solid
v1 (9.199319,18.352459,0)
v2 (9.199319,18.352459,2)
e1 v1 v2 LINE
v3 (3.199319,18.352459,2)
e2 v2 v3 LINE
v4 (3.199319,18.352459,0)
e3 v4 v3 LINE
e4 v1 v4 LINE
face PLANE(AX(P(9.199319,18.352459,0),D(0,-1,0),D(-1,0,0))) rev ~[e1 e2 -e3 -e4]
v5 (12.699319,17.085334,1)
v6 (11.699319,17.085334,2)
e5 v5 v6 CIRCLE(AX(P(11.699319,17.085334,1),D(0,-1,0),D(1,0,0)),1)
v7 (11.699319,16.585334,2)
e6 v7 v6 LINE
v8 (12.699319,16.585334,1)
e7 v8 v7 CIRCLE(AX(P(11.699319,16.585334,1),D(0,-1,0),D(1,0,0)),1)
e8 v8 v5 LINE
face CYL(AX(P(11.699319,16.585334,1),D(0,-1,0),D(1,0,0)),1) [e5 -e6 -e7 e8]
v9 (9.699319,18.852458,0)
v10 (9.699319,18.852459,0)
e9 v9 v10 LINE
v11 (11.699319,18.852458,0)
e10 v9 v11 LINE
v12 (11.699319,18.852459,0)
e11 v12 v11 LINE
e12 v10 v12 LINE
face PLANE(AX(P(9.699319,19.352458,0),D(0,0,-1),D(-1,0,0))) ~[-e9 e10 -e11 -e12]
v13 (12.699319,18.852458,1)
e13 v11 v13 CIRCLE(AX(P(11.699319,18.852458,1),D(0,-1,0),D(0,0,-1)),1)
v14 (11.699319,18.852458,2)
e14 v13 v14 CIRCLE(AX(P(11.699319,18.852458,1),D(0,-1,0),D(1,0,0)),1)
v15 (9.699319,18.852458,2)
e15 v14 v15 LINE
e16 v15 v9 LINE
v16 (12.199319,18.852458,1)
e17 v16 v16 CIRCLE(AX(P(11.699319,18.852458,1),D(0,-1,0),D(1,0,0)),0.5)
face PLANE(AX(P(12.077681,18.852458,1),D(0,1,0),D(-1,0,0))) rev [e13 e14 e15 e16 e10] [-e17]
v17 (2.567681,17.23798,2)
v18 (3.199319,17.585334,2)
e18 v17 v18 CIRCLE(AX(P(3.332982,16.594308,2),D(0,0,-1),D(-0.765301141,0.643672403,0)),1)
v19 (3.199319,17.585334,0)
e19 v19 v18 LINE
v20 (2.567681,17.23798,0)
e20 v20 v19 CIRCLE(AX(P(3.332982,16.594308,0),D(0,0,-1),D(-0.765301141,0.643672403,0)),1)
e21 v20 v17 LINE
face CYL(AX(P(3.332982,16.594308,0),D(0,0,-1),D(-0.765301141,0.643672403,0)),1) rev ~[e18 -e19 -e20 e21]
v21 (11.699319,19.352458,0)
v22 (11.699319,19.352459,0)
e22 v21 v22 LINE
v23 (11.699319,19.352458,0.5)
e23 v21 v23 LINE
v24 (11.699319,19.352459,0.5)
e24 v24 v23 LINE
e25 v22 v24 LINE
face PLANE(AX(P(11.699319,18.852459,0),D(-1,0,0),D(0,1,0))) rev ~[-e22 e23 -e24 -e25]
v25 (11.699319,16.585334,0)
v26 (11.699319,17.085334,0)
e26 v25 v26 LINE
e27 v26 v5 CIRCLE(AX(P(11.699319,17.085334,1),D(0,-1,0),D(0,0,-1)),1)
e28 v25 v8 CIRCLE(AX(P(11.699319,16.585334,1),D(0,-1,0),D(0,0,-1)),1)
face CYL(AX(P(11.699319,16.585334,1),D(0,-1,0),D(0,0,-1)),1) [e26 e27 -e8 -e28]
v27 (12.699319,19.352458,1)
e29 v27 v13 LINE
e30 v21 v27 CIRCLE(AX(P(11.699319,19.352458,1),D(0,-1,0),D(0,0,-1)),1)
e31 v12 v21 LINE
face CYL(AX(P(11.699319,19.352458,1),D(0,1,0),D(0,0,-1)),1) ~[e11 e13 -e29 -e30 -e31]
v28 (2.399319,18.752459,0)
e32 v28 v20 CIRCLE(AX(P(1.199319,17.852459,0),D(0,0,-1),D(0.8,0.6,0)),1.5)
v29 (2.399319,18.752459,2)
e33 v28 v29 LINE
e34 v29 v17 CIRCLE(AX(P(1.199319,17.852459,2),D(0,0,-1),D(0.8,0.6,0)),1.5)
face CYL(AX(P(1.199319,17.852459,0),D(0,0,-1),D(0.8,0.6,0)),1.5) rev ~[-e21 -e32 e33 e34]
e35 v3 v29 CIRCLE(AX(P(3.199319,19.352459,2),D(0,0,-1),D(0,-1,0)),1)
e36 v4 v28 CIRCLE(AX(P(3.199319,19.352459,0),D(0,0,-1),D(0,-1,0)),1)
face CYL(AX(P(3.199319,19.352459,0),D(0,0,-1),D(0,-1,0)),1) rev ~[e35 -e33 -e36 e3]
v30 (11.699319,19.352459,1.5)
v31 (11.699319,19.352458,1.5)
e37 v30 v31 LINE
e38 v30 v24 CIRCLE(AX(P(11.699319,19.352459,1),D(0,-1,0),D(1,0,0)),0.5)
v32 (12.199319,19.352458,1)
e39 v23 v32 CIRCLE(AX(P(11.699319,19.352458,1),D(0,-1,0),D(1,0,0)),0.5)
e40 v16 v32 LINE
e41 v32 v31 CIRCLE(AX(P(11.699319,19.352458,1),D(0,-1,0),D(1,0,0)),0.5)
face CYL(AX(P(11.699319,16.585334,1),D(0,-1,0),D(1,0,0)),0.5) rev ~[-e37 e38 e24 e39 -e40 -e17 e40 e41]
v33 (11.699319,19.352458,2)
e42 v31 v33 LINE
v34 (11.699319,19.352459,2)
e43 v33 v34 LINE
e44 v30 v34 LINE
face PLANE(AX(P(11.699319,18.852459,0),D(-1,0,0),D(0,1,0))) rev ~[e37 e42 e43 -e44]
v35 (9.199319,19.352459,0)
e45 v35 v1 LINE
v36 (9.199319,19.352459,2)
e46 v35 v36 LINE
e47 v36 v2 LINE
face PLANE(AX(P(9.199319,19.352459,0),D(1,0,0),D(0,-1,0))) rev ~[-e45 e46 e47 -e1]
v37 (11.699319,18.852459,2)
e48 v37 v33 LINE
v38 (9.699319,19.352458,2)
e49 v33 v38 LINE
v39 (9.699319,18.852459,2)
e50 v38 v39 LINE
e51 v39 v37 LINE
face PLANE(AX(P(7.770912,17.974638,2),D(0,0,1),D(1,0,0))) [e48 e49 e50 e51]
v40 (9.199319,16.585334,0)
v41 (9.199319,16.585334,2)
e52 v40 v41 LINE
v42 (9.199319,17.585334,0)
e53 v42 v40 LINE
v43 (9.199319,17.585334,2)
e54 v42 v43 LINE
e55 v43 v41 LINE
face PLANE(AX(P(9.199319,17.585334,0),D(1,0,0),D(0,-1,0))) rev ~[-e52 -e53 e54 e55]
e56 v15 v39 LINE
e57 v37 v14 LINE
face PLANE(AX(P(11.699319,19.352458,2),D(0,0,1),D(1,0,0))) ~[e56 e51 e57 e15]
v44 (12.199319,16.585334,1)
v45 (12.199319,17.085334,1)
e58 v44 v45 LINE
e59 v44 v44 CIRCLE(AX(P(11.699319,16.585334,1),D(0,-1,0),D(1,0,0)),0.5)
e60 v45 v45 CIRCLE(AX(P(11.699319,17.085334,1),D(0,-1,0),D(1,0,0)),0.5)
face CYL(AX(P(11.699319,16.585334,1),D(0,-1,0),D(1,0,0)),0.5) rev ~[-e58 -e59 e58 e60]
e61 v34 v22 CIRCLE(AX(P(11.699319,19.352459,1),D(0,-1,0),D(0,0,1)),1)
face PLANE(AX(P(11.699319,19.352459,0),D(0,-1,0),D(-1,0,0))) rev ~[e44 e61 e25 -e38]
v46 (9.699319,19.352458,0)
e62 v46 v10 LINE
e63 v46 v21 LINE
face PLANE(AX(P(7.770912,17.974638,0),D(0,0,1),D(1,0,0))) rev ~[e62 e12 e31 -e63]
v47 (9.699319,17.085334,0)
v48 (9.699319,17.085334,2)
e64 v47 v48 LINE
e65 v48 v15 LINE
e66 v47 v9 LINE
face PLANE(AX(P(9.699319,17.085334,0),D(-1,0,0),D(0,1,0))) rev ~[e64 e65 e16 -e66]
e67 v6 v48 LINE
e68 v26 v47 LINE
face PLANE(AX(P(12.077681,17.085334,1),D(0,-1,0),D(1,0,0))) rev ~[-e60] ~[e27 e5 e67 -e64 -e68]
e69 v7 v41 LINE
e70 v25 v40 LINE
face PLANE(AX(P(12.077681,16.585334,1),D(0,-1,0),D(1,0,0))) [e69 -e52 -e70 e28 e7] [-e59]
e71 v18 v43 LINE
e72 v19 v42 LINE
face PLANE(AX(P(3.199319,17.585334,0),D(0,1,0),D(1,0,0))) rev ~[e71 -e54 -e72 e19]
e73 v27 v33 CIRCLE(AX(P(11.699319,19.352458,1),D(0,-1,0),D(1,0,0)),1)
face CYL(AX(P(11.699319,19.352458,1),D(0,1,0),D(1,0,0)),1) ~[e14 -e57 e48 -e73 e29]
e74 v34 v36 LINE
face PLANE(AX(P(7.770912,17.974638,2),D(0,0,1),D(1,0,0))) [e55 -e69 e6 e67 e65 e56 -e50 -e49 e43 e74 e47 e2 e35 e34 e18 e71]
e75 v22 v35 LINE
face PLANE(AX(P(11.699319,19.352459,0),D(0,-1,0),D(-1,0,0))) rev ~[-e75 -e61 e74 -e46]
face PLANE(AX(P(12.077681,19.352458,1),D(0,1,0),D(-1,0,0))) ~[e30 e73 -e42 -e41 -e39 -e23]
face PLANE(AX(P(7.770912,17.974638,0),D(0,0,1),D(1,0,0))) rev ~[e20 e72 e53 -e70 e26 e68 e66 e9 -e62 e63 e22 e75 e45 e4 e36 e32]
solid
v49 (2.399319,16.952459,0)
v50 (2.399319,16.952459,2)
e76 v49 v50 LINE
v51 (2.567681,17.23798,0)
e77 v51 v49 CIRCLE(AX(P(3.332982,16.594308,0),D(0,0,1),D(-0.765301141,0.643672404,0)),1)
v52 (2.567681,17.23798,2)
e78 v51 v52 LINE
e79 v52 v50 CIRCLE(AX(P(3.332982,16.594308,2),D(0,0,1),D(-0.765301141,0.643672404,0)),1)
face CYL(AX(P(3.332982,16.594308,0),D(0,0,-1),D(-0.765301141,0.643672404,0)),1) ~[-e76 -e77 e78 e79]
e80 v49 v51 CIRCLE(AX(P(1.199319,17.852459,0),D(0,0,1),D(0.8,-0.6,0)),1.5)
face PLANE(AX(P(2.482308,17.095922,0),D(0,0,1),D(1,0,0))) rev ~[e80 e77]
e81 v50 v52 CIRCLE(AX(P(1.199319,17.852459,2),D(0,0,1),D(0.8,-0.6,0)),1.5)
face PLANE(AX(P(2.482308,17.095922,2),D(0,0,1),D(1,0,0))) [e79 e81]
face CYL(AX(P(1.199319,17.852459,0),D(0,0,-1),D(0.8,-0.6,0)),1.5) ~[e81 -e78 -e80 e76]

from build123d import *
from build123d import SkipClean  # not in build123d's __all__

# Parameters (mm, degrees)
F1_DEPTH = 2
F3_DEPTH = 0.5
F5_DEPTH = 0.5
F6_R     = 0.5
F7_DEPTH = 25


# Not quite as in the source:
# - a pattern or mirror of a feature is missing from the dataset's text; its kind, count and spacing are read off the source's solid


with BuildPart() as f1:
    # F0 (on Top) → F1 (new body)
    with BuildSketch(Plane.XY):
        with BuildLine():
            ThreePointArc((2.399318749, 16.9524586827), (2.4914108716, 17.0905545243), (2.5676812283, 17.23797994))
            ThreePointArc((2.5676812283, 17.23797994), (2.4715876211, 17.1022436421), (2.399318749, 16.9524586827))
        make_face()
    extrude(amount=F1_DEPTH)


with BuildPart() as f1b:
    # F0 (on Top) → F1, piece 2 (new body)
    with BuildSketch(Plane.XY):
        with BuildLine():
            ThreePointArc((3.199318749, 18.3524586827), (2.7521051535, 18.4580314917), (2.399318749, 18.7524586827))
            ThreePointArc((2.399318749, 18.7524586827), (2.6901349421, 18.0181906296), (2.5676812283, 17.23797994))
            ThreePointArc((2.5676812283, 17.23797994), (2.8511129134, 17.4705505548), (3.199318749, 17.5853342952))
            Line((3.199318749, 17.5853342952), (9.199318749, 17.5853342952))
            Line((9.199318749, 17.5853342952), (9.199318749, 16.5853342952))
            Line((9.199318749, 16.5853342952), (11.699318749, 16.5853342952))
            Line((11.699318749, 16.5853342952), (11.699318749, 17.0853342952))
            Line((11.699318749, 17.0853342952), (9.699318749, 17.0853342952))
            Line((9.699318749, 17.0853342952), (9.699318749, 18.8524586827))
            Line((9.699318749, 18.8524586827), (11.699318749, 18.8524586827))
            Line((11.699318749, 18.8524586827), (11.699318749, 19.3524586827))
            Line((11.699318749, 19.3524586827), (9.199318749, 19.3524586827))
            Line((9.199318749, 19.3524586827), (9.199318749, 18.3524586827))
            Line((9.199318749, 18.3524586827), (3.199318749, 18.3524586827))
        make_face()
    extrude(amount=F1_DEPTH)

    # F2 (on face) → F3 (join)
    with BuildSketch(Plane.XZ.offset(-16.5853342952)):
        with BuildLine():
            ThreePointArc((11.699318749, 0), (12.4064255302, 0.2928932188), (12.699318749, 1))
            ThreePointArc((12.699318749, 1), (12.4064255302, 1.7071067812), (11.699318749, 2))
            Line((11.699318749, 2), (11.699318749, 0))
        make_face()
        with BuildLine():
            Line((11.699318749, 0), (11.699318749, 2))
            ThreePointArc((11.699318749, 2), (10.699318749, 1), (11.699318749, 0))
        make_face()
        with BuildLine():
            ThreePointArc((11.699318749, 0), (10.699318749, 1), (11.699318749, 2))
            Line((11.699318749, 2), (9.699318749, 2))
            Line((9.699318749, 2), (9.699318749, 0))
            Line((9.699318749, 0), (11.699318749, 0))
        make_face()
    f3 = extrude(amount=-F3_DEPTH)

    # F3_copies: F3 across plane
    with SkipClean():  # cleaning this boolean's faces spoils the solid; the shape is the same uncleaned
        add(f3.mirror(Plane.ZX.offset(17.968896)), clean=False)

    # F4 (on face) → F5 (join)
    with BuildSketch(Plane.XZ.offset(-18.8524586827)):
        with BuildLine():
            Line((11.699318749, 0), (11.699318749, 2))
            ThreePointArc((11.699318749, 2), (10.699318749, 1), (11.699318749, 0))
        make_face()
    with SkipClean():  # cleaning this boolean's faces spoils the solid; the shape is the same uncleaned
        extrude(amount=-F5_DEPTH)

    # F6 (on face) → F7 (cut)
    with BuildSketch(Plane.XZ.offset(-16.5853342952)):
        with Locations((11.699318749, 1)):
            Circle(F6_R)
    with SkipClean():  # cleaning this boolean's faces spoils the solid; the shape is the same uncleaned
        extrude(amount=-F7_DEPTH, mode=Mode.SUBTRACT)


solid = Compound([f1.part, f1b.part])
